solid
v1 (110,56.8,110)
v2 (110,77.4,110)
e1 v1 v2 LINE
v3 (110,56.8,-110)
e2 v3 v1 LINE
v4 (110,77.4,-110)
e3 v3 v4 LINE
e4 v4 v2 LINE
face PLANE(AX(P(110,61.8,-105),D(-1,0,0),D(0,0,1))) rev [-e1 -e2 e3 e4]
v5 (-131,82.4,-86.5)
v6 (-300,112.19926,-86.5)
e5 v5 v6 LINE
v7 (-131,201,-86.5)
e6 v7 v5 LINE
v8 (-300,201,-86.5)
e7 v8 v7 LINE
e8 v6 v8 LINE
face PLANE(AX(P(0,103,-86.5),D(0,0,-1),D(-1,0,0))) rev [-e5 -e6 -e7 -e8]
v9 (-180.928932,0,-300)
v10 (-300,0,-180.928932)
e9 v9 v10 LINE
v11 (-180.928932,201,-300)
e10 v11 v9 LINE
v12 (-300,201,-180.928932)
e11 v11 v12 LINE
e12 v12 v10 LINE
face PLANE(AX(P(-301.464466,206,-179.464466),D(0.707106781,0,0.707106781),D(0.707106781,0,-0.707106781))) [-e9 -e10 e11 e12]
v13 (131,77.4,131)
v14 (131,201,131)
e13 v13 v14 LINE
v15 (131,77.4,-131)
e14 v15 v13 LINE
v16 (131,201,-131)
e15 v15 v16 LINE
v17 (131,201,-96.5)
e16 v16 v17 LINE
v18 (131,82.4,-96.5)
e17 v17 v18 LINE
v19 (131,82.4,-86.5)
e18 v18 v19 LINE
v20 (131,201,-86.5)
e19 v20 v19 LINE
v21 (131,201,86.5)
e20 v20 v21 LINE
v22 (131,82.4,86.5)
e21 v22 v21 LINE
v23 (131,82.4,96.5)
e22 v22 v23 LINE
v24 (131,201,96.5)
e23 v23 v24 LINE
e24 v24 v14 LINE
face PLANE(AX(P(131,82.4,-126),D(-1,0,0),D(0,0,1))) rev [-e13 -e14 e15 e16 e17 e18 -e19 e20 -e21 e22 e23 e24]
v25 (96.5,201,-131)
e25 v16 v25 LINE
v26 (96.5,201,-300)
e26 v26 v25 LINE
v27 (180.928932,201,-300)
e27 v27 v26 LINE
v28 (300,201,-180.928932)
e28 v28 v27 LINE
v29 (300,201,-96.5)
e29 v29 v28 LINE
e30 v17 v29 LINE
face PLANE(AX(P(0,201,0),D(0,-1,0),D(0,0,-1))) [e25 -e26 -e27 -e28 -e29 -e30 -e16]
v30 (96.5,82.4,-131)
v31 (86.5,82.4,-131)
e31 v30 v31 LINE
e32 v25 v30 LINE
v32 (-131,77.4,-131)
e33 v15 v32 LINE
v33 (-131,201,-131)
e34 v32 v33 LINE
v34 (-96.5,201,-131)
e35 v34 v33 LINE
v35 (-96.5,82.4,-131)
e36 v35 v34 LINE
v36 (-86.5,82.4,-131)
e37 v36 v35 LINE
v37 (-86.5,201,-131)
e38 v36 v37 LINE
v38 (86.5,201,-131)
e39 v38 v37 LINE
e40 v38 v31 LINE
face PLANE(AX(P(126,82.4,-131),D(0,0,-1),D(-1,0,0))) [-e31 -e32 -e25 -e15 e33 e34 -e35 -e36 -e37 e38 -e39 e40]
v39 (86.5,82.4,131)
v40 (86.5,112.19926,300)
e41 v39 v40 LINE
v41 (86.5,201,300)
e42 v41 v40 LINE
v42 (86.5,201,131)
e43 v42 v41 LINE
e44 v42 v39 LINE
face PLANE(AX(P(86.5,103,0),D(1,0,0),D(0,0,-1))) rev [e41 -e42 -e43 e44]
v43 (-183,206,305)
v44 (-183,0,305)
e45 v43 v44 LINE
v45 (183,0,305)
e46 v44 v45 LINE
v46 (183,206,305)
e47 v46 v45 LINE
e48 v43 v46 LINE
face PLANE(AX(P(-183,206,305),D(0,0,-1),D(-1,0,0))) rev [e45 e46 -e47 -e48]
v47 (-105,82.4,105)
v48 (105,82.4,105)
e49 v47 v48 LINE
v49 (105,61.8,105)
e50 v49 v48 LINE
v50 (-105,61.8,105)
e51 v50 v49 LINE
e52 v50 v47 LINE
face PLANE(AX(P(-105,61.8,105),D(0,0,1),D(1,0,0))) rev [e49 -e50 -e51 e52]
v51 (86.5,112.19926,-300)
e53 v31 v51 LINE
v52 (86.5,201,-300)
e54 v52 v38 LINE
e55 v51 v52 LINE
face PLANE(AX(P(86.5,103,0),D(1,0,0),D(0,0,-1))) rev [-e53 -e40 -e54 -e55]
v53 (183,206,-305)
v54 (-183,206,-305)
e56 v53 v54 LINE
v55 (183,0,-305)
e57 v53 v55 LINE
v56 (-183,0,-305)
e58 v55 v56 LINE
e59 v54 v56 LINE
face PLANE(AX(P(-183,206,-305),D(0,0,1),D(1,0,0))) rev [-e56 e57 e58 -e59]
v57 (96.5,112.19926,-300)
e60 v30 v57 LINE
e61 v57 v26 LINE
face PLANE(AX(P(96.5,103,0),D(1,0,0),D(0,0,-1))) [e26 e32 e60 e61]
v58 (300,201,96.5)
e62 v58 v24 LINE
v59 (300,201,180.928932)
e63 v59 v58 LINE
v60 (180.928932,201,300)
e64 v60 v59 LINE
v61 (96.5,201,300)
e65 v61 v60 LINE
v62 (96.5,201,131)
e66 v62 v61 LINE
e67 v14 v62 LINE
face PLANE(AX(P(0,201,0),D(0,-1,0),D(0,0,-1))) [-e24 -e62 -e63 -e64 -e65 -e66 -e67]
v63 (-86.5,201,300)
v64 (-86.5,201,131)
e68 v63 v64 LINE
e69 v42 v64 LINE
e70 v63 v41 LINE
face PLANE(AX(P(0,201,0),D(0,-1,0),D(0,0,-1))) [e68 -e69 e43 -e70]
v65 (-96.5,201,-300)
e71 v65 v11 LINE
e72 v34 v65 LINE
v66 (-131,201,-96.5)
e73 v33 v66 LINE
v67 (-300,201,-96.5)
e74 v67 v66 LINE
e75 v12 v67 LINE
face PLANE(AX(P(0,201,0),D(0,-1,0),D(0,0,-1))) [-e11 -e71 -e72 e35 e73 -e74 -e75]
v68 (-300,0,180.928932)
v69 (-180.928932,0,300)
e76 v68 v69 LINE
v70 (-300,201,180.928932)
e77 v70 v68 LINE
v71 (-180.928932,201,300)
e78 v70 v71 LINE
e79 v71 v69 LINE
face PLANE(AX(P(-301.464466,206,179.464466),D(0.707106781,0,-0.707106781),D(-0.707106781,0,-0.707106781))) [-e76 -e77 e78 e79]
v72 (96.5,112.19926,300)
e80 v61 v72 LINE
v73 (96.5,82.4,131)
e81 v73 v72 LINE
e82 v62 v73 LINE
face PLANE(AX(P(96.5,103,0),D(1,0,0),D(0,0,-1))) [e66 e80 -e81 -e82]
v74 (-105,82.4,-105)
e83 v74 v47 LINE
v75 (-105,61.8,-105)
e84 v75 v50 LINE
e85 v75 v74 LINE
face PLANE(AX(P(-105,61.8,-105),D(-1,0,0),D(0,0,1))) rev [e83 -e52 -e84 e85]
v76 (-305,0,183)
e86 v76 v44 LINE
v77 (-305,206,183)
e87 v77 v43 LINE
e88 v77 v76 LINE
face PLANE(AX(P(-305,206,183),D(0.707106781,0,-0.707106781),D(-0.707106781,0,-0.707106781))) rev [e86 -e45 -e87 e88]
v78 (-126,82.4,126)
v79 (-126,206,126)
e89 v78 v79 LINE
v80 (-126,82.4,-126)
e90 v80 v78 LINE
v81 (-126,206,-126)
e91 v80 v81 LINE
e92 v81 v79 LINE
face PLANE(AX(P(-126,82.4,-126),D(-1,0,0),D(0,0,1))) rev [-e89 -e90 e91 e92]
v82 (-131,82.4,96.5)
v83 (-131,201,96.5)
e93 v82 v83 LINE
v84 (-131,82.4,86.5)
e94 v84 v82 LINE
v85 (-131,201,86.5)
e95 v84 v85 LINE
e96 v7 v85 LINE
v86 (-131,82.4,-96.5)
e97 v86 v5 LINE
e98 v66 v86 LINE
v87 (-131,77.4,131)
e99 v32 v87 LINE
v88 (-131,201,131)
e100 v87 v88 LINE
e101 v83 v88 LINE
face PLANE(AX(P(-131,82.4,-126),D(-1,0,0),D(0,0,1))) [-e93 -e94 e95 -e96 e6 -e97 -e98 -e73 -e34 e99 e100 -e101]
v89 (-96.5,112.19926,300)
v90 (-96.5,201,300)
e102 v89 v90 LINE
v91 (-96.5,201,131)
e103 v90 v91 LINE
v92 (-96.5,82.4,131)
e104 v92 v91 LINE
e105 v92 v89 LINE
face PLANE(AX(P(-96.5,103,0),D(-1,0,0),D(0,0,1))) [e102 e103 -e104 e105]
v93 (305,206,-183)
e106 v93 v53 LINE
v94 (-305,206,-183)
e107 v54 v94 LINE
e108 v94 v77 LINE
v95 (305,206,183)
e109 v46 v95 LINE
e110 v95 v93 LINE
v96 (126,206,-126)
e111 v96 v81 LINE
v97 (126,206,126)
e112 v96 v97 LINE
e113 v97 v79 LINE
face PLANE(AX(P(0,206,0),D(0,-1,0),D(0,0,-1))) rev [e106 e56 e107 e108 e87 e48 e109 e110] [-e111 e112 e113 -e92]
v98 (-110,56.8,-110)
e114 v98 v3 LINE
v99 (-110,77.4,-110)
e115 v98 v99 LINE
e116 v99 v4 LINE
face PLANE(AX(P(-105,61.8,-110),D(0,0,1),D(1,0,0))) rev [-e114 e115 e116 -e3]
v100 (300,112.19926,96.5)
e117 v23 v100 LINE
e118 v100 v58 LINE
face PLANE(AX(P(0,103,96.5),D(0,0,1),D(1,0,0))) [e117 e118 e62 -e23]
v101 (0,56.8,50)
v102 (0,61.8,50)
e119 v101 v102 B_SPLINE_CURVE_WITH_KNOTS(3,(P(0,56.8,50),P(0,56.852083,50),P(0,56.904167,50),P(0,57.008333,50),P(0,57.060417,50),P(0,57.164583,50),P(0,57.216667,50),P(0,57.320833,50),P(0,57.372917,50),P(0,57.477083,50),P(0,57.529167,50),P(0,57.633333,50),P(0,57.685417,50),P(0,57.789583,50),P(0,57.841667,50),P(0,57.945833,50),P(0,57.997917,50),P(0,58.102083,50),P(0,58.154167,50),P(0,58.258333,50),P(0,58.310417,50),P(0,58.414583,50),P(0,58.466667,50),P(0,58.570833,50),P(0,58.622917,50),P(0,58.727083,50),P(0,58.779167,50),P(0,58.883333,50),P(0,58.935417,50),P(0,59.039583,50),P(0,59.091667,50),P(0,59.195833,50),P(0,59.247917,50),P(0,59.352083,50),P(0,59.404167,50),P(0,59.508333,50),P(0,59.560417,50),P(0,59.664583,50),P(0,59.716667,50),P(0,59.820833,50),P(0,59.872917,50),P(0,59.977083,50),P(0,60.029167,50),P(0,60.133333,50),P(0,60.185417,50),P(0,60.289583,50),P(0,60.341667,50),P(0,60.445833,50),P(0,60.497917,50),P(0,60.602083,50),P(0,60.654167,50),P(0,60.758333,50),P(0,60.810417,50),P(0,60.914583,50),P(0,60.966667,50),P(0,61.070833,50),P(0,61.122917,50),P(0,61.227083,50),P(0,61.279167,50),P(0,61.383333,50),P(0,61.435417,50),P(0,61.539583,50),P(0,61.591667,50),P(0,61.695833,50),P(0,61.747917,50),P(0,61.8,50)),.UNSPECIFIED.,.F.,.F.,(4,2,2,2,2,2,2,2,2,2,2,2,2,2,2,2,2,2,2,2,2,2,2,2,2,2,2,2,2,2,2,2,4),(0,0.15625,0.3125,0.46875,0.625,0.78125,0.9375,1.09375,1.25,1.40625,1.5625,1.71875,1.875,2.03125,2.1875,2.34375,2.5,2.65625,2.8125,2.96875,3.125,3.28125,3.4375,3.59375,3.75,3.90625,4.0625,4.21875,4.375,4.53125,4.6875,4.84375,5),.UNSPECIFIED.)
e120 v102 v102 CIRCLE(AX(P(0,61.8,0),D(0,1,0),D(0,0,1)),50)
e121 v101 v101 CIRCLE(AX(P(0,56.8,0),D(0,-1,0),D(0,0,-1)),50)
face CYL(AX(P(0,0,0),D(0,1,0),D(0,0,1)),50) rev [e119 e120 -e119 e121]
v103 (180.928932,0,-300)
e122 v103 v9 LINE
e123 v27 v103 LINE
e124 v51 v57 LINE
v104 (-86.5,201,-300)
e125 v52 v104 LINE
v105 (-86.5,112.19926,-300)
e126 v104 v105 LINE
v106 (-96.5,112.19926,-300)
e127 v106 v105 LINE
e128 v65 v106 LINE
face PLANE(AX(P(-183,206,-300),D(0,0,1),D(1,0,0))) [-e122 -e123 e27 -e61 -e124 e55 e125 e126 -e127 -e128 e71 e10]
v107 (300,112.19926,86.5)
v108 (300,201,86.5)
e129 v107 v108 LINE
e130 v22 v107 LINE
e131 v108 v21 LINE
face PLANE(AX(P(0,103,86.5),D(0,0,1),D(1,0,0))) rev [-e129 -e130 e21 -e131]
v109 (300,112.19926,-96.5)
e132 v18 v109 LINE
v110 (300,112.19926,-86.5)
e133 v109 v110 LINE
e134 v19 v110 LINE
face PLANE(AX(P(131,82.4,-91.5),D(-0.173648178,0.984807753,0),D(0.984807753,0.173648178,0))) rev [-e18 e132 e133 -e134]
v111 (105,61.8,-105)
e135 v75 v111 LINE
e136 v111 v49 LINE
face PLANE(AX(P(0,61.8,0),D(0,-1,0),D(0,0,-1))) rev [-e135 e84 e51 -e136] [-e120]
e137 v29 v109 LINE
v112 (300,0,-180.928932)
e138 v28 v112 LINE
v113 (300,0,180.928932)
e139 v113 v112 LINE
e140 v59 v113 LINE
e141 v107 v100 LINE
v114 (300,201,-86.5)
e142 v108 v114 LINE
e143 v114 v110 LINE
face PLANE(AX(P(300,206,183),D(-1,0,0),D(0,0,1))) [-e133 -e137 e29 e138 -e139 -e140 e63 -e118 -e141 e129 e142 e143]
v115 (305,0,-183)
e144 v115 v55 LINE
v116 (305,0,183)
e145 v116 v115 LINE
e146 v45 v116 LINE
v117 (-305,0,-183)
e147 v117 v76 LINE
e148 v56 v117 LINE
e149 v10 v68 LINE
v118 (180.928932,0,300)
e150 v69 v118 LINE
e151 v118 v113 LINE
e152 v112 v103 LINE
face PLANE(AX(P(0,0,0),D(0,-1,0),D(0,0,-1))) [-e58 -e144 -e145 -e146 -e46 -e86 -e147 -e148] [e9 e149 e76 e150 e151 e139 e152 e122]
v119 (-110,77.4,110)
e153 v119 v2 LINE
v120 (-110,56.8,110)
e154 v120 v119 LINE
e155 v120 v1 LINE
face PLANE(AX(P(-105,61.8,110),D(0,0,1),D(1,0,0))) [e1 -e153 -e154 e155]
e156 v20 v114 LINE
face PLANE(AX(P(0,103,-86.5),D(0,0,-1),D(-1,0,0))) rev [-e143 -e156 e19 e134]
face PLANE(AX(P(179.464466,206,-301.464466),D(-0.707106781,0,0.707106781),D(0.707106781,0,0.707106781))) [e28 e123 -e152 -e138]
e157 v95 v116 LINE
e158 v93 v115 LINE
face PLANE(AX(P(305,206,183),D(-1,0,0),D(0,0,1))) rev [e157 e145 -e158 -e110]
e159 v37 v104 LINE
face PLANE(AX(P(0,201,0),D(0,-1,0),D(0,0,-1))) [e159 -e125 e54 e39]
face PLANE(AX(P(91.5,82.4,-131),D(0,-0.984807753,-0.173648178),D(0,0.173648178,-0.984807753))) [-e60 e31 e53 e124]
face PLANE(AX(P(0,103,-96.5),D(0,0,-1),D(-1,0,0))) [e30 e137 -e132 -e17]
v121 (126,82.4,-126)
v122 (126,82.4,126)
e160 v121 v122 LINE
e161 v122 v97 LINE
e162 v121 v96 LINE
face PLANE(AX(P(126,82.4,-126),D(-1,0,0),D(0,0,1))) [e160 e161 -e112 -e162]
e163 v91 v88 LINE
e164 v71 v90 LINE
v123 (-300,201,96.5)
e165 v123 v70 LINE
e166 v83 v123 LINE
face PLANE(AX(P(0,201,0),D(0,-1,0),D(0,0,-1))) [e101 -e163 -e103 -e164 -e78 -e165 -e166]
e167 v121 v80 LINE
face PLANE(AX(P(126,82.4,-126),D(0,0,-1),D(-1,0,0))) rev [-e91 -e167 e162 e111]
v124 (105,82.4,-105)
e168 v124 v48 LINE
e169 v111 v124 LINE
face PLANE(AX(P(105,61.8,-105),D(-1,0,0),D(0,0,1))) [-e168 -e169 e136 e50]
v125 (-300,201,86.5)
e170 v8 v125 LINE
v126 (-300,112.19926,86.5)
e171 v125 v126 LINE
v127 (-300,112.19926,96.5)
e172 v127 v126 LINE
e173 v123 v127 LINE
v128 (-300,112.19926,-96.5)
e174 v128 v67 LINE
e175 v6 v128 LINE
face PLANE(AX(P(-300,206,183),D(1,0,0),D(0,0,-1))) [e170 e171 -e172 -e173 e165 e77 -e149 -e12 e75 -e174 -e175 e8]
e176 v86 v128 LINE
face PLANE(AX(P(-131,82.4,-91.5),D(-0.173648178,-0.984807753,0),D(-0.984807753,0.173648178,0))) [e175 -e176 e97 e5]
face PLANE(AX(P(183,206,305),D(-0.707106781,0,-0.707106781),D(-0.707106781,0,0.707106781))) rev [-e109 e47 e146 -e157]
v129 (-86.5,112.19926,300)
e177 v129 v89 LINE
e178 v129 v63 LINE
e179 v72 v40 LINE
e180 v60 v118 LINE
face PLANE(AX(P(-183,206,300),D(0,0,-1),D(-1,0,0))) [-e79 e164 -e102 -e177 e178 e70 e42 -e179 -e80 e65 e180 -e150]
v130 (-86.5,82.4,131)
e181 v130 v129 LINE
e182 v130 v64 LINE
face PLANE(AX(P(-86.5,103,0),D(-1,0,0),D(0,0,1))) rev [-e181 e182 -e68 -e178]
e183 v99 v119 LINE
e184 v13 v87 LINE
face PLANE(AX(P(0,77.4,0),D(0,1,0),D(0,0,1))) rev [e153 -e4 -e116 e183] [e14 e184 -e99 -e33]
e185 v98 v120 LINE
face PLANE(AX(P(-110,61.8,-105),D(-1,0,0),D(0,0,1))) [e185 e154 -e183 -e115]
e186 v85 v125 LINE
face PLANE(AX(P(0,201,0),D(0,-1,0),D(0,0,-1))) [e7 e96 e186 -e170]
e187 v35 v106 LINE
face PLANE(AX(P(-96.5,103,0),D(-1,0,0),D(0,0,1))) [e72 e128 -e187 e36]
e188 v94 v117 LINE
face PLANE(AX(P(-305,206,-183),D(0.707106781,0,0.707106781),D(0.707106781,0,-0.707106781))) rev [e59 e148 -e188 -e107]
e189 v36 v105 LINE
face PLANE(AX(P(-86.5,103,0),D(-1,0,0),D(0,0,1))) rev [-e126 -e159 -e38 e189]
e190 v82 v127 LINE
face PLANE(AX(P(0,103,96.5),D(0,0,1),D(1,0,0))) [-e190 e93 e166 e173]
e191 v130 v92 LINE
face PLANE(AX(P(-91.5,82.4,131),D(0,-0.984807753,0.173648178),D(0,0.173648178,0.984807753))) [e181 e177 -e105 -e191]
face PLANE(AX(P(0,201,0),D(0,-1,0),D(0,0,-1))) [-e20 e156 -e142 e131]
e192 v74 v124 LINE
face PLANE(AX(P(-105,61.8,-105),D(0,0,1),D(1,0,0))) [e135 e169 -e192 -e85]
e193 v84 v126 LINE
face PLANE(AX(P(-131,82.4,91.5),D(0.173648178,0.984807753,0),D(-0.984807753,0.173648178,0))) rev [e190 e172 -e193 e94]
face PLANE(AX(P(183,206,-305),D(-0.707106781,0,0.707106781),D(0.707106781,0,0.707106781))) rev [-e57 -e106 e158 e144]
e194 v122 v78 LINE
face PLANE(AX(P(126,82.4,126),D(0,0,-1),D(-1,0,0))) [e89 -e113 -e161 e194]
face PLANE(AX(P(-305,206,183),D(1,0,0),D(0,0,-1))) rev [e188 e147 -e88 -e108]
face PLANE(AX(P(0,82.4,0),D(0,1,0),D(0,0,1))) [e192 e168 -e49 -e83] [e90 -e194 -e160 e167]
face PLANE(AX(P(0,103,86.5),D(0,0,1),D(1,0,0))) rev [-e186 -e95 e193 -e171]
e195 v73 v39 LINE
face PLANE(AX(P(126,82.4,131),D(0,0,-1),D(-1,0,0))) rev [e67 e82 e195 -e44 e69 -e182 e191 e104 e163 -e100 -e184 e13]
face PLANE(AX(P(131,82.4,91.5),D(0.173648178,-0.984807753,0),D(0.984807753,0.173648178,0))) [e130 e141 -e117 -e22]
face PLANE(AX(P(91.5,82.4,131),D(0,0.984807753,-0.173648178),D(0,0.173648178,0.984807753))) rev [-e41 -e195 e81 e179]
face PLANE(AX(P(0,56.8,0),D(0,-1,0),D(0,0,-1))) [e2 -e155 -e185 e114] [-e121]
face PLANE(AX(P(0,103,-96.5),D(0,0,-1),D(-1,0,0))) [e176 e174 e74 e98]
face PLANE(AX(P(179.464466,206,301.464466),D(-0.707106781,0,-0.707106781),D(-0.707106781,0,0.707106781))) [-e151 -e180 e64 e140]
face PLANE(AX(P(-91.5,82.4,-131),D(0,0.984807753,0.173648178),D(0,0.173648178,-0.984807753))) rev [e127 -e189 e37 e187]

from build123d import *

# Parameters (mm, degrees)
EXTRUDE_1_DEPTH                    = 206
SKETCH_3_W                         = 252
SKETCH_3_H                         = 252
CUT_EXTRUDE_1_DEPTH                = 123.6
SKETCH_5_W                         = 210
SKETCH_5_H                         = 210
CUT_EXTRUDE_5_DEPTH                = 20.6
SHELL_9_T                          = -5
SKETCH_6_R                         = 50
CUT_EXTRUDE_6_DEPTH                = 455.80065963
RIB_1_REACH                        = 542.993
SKETCH_7_WALL_W                    = 1255.59277199
SKETCH_7_WALL_H                    = 10
PATTERN_CIRCULAR_1_COUNT           = 4
PATTERN_CIRCULAR_1_COPY_1_REACH    = 542.993
PATTERN_CIRCULAR_1_COPY_1_SKETCH_W = 1255.59277199
PATTERN_CIRCULAR_1_COPY_1_SKETCH_H = 10
PATTERN_CIRCULAR_1_COPY_2_REACH    = 542.993
PATTERN_CIRCULAR_1_COPY_2_SKETCH_W = 1255.59277199
PATTERN_CIRCULAR_1_COPY_2_SKETCH_H = 10
PATTERN_CIRCULAR_1_COPY_3_REACH    = 542.993
PATTERN_CIRCULAR_1_COPY_3_SKETCH_W = 1255.59277199
PATTERN_CIRCULAR_1_COPY_3_SKETCH_H = 10


with BuildPart() as part:
    # 草图1 → 凸台-拉伸1 (new body)
    with BuildSketch(Plane(origin=(0, 0, 0), x_dir=(1, 0, 0), z_dir=(0, 1, 0))):
        Polygon((-305, 183), (-183, 305), (183, 305), (305, 183), (305, -183), (183, -305), (-183, -305), (-305, -183), align=None)
    extrude(amount=EXTRUDE_1_DEPTH)

    # 草图3 → 切除-拉伸1 (cut)
    with BuildSketch(Plane(origin=(0, 206, 0), x_dir=(1, 0, 0), z_dir=(0, 1, 0))):
        Rectangle(SKETCH_3_W, SKETCH_3_H)
    extrude(amount=-CUT_EXTRUDE_1_DEPTH, mode=Mode.SUBTRACT)

    # 草图5 → 切除-拉伸5 (cut)
    with BuildSketch(Plane(origin=(0, 82.4, 0), x_dir=(1, 0, 0), z_dir=(0, 1, 0))):
        Rectangle(SKETCH_5_W, SKETCH_5_H)
    extrude(amount=-CUT_EXTRUDE_5_DEPTH, mode=Mode.SUBTRACT)

    # 抽壳9
    shell_9_openings = [part.faces().sort_by_distance(p)[0] for p in [
        (0, 0, 0),
    ]]
    offset(amount=SHELL_9_T, openings=shell_9_openings, kind=Kind.INTERSECTION)

    # 草图6 → 切除-拉伸6 (cut, through all)
    with BuildSketch(Plane(origin=(0, 61.8, 0), x_dir=(1, 0, 0), z_dir=(0, 1, 0))):
        Circle(SKETCH_6_R)
    extrude(amount=-CUT_EXTRUDE_6_DEPTH, mode=Mode.SUBTRACT)

    # 草图7 wall → 筋1 (add, up to next)
    with BuildSketch(Plane(origin=(-215.5, 97.29962987, 91.5), x_dir=(-0.984807753012, 0.173648177668, 0), z_dir=(-0.173648177668, -0.984807753012, 0)), mode=Mode.PRIVATE) as rib_1_sk1:
        Rectangle(SKETCH_7_WALL_W, SKETCH_7_WALL_H)
    rib_1_tool1 = extrude(rib_1_sk1.sketch, amount=-RIB_1_REACH, mode=Mode.PRIVATE) - part.part
    rib_1 = rib_1_tool1.solids().sort_by_distance((-215.5, 97.29962987, 91.5))[0]
    add(rib_1)

    # 镜向1: 筋1 across plane
    add(rib_1.mirror(Plane.XY))

    # 阵列(圆周)1: 筋1 ×4 about axis
    pattern_circular_1_axis = Axis((0, 56.8, 0), (0, -1, 0))
    for i in range(1, PATTERN_CIRCULAR_1_COUNT):
        add(rib_1.rotate(pattern_circular_1_axis, i * 360 / PATTERN_CIRCULAR_1_COUNT))

    # 阵列(圆周)1 copy 1 sketch → 阵列(圆周)1 copy 1 (add, up to next)
    with BuildSketch(Plane(origin=(91.5, 97.29962987, -215.5), x_dir=(0, 0.173648177668, -0.984807753012), z_dir=(0, -0.984807753012, -0.173648177668)), mode=Mode.PRIVATE) as pattern_circular_1_copy_1_sk1:
        Rectangle(PATTERN_CIRCULAR_1_COPY_1_SKETCH_W, PATTERN_CIRCULAR_1_COPY_1_SKETCH_H)
    pattern_circular_1_copy_1_tool1 = extrude(pattern_circular_1_copy_1_sk1.sketch, amount=-PATTERN_CIRCULAR_1_COPY_1_REACH, mode=Mode.PRIVATE) - part.part
    add(pattern_circular_1_copy_1_tool1.solids().sort_by_distance((91.5, 97.29962987, -215.5))[0])

    # 阵列(圆周)1 copy 2 sketch → 阵列(圆周)1 copy 2 (add, up to next)
    with BuildSketch(Plane(origin=(215.5, 97.29962987, 91.5), x_dir=(0.984807753012, 0.173648177668, 0), z_dir=(0.173648177668, -0.984807753012, 0)), mode=Mode.PRIVATE) as pattern_circular_1_copy_2_sk1:
        Rectangle(PATTERN_CIRCULAR_1_COPY_2_SKETCH_W, PATTERN_CIRCULAR_1_COPY_2_SKETCH_H)
    pattern_circular_1_copy_2_tool1 = extrude(pattern_circular_1_copy_2_sk1.sketch, amount=-PATTERN_CIRCULAR_1_COPY_2_REACH, mode=Mode.PRIVATE) - part.part
    add(pattern_circular_1_copy_2_tool1.solids().sort_by_distance((215.5, 97.29962987, 91.5))[0])

    # 阵列(圆周)1 copy 3 sketch → 阵列(圆周)1 copy 3 (add, up to next)
    with BuildSketch(Plane(origin=(-91.5, 97.29962987, 215.5), x_dir=(0, 0.173648177668, 0.984807753012), z_dir=(0, -0.984807753012, 0.173648177668)), mode=Mode.PRIVATE) as pattern_circular_1_copy_3_sk1:
        Rectangle(PATTERN_CIRCULAR_1_COPY_3_SKETCH_W, PATTERN_CIRCULAR_1_COPY_3_SKETCH_H)
    pattern_circular_1_copy_3_tool1 = extrude(pattern_circular_1_copy_3_sk1.sketch, amount=-PATTERN_CIRCULAR_1_COPY_3_REACH, mode=Mode.PRIVATE) - part.part
    add(pattern_circular_1_copy_3_tool1.solids().sort_by_distance((-91.5, 97.29962987, 215.5))[0])


solid = part.part
